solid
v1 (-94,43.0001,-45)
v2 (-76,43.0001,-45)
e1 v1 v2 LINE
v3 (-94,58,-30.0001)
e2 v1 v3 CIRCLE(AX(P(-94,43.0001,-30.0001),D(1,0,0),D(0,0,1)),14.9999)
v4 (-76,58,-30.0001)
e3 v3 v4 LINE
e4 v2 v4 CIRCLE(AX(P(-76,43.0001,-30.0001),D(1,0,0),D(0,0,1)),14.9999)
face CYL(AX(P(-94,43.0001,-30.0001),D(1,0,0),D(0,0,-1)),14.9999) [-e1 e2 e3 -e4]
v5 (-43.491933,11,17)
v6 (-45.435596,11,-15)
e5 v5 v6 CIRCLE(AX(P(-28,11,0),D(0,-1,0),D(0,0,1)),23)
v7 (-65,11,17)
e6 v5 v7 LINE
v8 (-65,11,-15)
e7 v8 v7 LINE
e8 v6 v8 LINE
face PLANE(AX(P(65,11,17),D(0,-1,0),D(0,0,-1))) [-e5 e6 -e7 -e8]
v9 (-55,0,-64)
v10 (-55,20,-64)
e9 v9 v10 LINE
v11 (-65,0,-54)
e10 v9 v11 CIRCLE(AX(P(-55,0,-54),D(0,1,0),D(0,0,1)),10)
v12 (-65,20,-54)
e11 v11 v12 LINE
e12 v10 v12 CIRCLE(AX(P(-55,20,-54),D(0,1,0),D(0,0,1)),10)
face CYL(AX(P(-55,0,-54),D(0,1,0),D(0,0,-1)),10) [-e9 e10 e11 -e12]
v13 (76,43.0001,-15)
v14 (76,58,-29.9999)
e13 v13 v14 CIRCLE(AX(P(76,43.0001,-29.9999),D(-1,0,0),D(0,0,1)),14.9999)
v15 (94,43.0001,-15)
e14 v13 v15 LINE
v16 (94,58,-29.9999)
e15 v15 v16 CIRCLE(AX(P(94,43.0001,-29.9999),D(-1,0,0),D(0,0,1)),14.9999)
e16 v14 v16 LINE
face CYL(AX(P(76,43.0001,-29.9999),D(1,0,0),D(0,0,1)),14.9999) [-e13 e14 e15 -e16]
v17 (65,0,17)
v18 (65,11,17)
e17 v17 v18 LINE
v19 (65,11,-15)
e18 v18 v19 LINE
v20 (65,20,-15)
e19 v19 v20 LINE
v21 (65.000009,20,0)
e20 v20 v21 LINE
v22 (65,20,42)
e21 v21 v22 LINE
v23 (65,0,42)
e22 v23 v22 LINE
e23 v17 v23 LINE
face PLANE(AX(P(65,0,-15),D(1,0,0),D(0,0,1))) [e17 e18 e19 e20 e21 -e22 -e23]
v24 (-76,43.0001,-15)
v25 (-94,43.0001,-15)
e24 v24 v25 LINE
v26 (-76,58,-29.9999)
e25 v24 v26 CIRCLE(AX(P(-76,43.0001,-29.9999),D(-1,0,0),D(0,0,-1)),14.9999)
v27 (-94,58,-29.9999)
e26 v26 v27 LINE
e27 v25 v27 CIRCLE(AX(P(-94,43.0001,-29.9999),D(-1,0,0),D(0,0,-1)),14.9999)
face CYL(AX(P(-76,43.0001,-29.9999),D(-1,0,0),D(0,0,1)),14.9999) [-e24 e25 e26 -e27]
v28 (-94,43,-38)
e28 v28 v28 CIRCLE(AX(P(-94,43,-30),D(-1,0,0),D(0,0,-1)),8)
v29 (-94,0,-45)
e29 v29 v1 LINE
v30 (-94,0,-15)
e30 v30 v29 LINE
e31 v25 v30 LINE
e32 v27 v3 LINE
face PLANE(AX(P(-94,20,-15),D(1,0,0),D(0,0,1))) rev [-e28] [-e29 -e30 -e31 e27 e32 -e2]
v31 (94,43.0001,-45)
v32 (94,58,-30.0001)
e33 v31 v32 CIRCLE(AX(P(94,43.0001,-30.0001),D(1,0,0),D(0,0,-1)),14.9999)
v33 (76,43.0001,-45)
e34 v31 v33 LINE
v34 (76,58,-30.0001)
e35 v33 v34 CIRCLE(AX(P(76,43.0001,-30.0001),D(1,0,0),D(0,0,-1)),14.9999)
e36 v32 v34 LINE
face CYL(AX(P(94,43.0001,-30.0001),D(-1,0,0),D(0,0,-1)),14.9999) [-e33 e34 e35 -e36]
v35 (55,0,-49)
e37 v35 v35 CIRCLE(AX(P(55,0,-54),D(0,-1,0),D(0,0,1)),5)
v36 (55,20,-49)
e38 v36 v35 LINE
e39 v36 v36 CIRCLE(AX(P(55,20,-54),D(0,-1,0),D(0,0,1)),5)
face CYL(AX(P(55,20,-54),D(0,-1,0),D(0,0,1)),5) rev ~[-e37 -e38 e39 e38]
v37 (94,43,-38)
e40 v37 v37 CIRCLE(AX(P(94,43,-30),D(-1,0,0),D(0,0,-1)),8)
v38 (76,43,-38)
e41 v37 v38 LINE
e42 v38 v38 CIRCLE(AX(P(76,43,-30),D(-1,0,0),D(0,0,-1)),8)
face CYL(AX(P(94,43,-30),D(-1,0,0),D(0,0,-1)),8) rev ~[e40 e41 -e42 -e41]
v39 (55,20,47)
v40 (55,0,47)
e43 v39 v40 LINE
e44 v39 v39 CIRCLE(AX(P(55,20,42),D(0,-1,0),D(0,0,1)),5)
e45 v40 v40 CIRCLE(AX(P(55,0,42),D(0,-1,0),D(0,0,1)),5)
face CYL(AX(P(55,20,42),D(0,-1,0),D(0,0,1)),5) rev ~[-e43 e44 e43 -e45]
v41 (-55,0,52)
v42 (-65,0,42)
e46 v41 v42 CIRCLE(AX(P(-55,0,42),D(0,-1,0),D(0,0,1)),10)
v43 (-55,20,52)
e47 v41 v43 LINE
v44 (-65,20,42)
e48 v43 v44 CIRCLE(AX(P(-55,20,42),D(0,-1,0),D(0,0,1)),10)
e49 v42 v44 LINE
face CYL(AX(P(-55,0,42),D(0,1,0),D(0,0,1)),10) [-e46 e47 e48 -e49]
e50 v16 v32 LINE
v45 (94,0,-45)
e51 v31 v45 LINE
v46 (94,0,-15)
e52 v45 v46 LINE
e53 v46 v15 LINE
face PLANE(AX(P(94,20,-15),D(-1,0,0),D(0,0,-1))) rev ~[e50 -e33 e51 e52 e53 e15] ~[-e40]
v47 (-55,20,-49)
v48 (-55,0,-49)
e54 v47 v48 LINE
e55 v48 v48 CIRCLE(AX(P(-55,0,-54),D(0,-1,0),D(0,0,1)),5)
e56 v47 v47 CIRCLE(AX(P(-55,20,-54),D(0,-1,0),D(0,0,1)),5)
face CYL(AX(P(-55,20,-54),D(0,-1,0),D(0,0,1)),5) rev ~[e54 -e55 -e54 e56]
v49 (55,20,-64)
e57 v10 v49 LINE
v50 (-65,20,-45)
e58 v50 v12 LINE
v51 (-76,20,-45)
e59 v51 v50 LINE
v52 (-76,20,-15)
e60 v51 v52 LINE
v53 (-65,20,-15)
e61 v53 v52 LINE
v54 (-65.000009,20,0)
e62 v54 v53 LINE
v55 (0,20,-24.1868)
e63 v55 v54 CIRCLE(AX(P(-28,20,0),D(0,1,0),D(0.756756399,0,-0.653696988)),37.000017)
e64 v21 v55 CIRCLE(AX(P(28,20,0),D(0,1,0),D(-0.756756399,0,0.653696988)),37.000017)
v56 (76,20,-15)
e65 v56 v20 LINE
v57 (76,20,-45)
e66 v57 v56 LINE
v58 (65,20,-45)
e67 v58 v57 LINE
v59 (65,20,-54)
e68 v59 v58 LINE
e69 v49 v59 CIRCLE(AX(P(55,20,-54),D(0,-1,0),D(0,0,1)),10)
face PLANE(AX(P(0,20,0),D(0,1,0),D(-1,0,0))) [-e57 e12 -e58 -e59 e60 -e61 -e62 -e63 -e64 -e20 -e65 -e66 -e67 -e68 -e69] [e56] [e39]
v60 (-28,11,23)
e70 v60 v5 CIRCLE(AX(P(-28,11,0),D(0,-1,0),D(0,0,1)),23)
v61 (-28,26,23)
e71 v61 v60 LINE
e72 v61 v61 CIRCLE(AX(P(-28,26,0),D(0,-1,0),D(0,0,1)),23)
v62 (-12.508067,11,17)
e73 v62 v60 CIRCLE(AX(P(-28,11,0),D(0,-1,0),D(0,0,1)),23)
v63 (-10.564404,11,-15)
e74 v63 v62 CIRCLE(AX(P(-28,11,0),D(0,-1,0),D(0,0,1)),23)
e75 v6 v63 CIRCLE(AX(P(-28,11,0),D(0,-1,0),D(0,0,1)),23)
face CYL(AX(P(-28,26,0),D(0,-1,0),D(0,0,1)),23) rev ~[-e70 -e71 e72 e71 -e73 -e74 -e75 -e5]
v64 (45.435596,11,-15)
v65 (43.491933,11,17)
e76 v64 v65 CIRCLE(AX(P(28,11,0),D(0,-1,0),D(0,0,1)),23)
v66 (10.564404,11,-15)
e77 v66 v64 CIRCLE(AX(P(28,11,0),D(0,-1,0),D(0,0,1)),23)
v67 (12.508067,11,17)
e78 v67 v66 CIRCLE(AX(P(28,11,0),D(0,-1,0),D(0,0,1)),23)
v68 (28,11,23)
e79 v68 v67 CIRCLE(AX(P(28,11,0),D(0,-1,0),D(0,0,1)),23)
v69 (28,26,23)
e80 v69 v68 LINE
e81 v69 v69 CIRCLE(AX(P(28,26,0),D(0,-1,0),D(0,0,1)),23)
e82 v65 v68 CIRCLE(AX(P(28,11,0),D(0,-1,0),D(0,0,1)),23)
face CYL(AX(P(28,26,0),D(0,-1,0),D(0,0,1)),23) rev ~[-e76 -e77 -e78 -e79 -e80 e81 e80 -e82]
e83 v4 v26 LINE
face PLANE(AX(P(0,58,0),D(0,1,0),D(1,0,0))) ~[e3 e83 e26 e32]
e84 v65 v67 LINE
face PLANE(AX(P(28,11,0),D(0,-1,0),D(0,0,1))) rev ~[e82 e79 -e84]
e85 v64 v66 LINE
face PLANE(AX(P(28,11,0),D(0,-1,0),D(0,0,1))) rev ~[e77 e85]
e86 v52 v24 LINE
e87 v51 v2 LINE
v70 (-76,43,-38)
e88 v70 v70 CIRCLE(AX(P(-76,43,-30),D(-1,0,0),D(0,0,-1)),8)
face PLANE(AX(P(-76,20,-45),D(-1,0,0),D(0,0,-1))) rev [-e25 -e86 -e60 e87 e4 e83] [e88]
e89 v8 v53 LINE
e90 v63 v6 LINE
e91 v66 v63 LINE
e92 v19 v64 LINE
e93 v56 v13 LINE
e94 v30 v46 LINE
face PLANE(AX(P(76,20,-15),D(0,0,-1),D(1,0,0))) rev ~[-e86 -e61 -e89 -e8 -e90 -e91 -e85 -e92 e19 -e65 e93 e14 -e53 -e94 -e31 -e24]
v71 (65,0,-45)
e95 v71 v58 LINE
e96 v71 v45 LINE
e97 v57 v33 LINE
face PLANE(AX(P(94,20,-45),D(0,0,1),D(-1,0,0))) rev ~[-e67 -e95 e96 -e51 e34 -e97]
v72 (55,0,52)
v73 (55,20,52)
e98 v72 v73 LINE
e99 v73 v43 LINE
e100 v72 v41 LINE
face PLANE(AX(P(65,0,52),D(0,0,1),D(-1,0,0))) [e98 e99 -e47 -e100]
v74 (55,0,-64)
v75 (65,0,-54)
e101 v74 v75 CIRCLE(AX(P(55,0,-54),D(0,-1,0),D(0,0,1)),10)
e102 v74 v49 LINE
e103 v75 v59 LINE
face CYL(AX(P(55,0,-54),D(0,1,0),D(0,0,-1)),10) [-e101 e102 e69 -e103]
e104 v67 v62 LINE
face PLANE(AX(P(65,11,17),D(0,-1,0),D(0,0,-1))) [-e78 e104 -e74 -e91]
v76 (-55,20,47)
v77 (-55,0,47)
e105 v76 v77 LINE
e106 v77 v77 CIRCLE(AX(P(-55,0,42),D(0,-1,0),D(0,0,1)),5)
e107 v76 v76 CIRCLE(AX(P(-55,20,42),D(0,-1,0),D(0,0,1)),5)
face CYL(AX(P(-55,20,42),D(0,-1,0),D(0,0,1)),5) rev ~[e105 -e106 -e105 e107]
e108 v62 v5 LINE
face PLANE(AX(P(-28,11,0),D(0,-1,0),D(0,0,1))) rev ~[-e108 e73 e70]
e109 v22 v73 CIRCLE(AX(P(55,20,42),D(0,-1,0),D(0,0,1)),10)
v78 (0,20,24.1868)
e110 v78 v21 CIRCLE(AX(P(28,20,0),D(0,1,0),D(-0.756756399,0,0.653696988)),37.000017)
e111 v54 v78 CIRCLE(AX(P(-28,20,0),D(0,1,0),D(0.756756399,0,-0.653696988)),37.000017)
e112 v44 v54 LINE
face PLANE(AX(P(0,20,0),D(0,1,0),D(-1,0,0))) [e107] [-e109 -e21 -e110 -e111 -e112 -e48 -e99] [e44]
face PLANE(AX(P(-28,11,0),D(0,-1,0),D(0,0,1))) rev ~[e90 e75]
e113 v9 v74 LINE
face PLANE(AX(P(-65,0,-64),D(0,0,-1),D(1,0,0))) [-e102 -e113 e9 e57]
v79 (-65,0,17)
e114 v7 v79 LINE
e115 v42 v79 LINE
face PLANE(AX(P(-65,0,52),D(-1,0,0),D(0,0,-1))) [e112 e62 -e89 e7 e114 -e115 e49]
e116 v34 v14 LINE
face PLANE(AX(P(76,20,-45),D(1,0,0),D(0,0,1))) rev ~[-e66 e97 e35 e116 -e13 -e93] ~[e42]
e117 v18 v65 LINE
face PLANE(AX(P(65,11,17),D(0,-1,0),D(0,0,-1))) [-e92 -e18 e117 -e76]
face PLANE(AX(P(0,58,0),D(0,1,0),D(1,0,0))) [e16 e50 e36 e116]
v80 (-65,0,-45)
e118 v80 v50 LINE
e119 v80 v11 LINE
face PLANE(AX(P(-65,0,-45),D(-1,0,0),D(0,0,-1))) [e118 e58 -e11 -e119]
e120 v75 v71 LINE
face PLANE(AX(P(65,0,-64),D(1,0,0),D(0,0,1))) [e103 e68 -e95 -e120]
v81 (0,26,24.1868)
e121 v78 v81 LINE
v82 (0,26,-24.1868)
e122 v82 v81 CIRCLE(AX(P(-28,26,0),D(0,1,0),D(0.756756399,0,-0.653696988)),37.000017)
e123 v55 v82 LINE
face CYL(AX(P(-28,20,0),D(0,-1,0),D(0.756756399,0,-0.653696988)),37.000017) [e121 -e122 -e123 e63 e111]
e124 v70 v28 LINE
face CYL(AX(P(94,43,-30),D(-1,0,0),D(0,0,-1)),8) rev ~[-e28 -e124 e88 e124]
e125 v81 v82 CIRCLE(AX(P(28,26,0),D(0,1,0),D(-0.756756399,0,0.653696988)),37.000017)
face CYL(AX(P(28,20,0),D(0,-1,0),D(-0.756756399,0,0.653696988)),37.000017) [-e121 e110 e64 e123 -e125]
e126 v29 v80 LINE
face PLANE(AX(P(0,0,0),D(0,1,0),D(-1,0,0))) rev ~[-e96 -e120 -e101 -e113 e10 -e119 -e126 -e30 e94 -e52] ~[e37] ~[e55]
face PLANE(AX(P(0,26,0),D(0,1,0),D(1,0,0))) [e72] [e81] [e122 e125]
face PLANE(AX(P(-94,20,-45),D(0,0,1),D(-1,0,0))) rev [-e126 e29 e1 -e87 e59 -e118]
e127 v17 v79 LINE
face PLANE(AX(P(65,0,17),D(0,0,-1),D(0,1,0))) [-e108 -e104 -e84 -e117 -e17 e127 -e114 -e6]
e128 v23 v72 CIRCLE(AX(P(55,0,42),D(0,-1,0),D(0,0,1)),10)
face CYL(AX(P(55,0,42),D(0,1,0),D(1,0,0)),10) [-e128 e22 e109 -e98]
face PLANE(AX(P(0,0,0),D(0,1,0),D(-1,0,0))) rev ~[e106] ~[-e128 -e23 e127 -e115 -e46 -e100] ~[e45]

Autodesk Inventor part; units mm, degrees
ref_plane "YZ Plane" through (0, 0, 0) normal (1, 0, 0) x (0, 1, 0)
ref_plane "XZ Plane" through (0, 0, 0) normal (0, 1, 0) x (-1, 0, 0)
ref_plane "XY Plane" through (0, 0, 0) normal (0, 0, 1) x (1, 0, 0)
sketch "Sketch1" plane through (0, 0, 0) normal (0, 1, 0) x (-1, 0, 0)
  line L0 (65, -64) -> (-65, -64)
  line L1 (-65, -64) -> (-65, -45)
  line L2 (-65, 52) -> (65, 52)
  line L3 (65, 52) -> (65, -15)
  line L4 (94, -45) -> (65, -45)
  line L5 (65, -45) -> (65, -15) construction
  line L6 (65, -15) -> (94, -15)
  line L7 (94, -15) -> (94, -45)
  line L8 (-65, -45) -> (-94, -45)
  line L9 (-94, -45) -> (-94, -15)
  line L10 (-94, -15) -> (-65, -15)
  line L11 (-65, -15) -> (-65, -30) construction
  line L12 (94, -30) -> (-94, -30) construction
  line L13 (65, -45) -> (65, -64)
  line L14 (65, -15) -> (65, -45) construction
  line L15 (-65, -45) -> (-65, -15) construction
  line L16 (-65, -30) -> (-65, -45) construction
  line L17 (-65, -15) -> (-65, 52)
  point P0 (0, 0)
  point P1 (0, 52)
  dimension "d0" = 116
  dimension "d1" = 130
  dimension "d2" = 52
  dimension "d3" = 30
  dimension "d4" = 30
  dimension "d5" = 188
extrude "Extrusion1" add sketch "Sketch1" along normal blind 20
fillet "Fillet1" radius 10 4 edges at (65, 10, 52) (-65, 10, 52) (-65, 10, -64) (65, 10, -64)
sketch "Sketch2" plane through (0, 20, 0) normal (0, 1, 0) x (1, 0, 0)
  line L0 (65, 15) -> (94, 15) projected
  line L1 (94, 15) -> (94, 45) projected
  line L2 (94, 45) -> (65, 45) projected
  line L3 (94, 15) -> (94, 45) projected
  line L4 (65, 15) -> (94, 15) projected
  line L5 (94, 45) -> (76, 45)
  line L6 (76, 45) -> (76, 15)
  line L7 (76, 15) -> (94, 15)
  line L8 (94, 15) -> (94, 45)
  point P0 (0, 0)
  dimension "d9" = 18
extrude "Extrusion2" add sketch "Sketch2" along normal blind 38
fillet "Fillet2" radius 15 2 edges at (85, 58, -15) (85, 58, -45)
mirror "Mirror1" about plane through (0, 0, 0) normal (1, 0, 0) of "Extrusion2", "Fillet2"
sketch "Sketch3" plane through (94, 0, -15) normal (1, 0, 0) x (0, 0, -1)
  arc A0 (30, 43) -> (0, 43) centre (15, 43) ccw projected
  point P0 (-15, 0)
hole "Hole1" at (94, 43, -30) direction (-1, 0, 0) diameter 16 end through all
sketch "Sketch4" plane through (0, 20, 0) normal (0, 1, 0) x (1, 0, 0)
  line L0 (-55, -52) -> (55, -52) projected
  arc A0 (0, 24.1868) -> (0, -24.1868) centre (-28, 0) ccw
  line L1 (55, 64) -> (-55, 64) projected
  line L2 (0, 64) -> (0, -52) construction
  arc A1 (0, -24.1868) -> (0, 24.1868) centre (28, 0) ccw
  point P0 (0, 0)
  dimension "d20" = 74
  dimension "d21" = 56
extrude "Extrusion3" add sketch "Sketch4" along normal blind 6
sketch "Sketch5" plane through (0, 26, 0) normal (0, 1, 0) x (1, 0, 0)
  arc A0 (0, 24.1868) -> (0, -24.1868) centre (-28, 0) ccw projected
  point P0 (0, 0)
hole "Hole2" at (-28, 26, 0) direction (0, -1, 0) diameter 46 depth 15
sketch "Sketch6" plane through (0, 26, 0) normal (0, 1, 0) x (1, 0, 0)
  arc A0 (0, -24.1868) -> (0, 24.1868) centre (28, 0) ccw projected
  point P0 (0, 0)
  point P1 (28, 0)
hole "Hole3" at (28, 26, 0) direction (0, -1, 0) diameter 46 depth 15
sketch "Sketch7" plane through (65, 0, -15) normal (1, 0, 0) x (0, 0, -1)
  line L0 (-57, 0) -> (0, 0) projected
  line L1 (0, 0) -> (0, 20) projected
  line L2 (0, 0) -> (-32, 0)
  line L3 (-32, 0) -> (-32, 11)
  line L4 (-32, 11) -> (0, 11)
  line L5 (0, 11) -> (0, 0)
  point P0 (-15, 0)
  point P1 (0, 11)
  dimension "d38" = 32
  dimension "d39" = 11
extrude "Extrusion4" cut sketch "Sketch7" against normal through all
sketch "Sketch8" plane through (0, 20, 0) normal (0, 1, 0) x (1, 0, 0)
  arc A0 (65, 54) -> (55, 64) centre (55, 54) ccw projected
  arc A1 (-55, 64) -> (-65, 54) centre (-55, 54) ccw projected
  arc A2 (-65, 0) -> (0, -24.1868) centre (-28, 0) ccw projected
  line L0 (-65, 0) -> (-65, -42) projected
  arc A3 (-65, -42) -> (-55, -52) centre (-55, -42) ccw projected
  line L1 (-55, -52) -> (55, -52) projected
  arc A4 (55, -52) -> (65, -42) centre (55, -42) ccw projected
  line L2 (65, -42) -> (65, 0) projected
  arc A5 (0, -24.1868) -> (65, 0) centre (28, 0) ccw projected
  point P0 (0, 0)
hole "Hole4" at (-55, 20, -54) at (55, 20, -54) at (55, 20, 42) at (-55, 20, 42) direction (0, -1, 0) diameter 10 end through all
properties part number "Part023. Cylinder head" material "Steel, Carbon"
